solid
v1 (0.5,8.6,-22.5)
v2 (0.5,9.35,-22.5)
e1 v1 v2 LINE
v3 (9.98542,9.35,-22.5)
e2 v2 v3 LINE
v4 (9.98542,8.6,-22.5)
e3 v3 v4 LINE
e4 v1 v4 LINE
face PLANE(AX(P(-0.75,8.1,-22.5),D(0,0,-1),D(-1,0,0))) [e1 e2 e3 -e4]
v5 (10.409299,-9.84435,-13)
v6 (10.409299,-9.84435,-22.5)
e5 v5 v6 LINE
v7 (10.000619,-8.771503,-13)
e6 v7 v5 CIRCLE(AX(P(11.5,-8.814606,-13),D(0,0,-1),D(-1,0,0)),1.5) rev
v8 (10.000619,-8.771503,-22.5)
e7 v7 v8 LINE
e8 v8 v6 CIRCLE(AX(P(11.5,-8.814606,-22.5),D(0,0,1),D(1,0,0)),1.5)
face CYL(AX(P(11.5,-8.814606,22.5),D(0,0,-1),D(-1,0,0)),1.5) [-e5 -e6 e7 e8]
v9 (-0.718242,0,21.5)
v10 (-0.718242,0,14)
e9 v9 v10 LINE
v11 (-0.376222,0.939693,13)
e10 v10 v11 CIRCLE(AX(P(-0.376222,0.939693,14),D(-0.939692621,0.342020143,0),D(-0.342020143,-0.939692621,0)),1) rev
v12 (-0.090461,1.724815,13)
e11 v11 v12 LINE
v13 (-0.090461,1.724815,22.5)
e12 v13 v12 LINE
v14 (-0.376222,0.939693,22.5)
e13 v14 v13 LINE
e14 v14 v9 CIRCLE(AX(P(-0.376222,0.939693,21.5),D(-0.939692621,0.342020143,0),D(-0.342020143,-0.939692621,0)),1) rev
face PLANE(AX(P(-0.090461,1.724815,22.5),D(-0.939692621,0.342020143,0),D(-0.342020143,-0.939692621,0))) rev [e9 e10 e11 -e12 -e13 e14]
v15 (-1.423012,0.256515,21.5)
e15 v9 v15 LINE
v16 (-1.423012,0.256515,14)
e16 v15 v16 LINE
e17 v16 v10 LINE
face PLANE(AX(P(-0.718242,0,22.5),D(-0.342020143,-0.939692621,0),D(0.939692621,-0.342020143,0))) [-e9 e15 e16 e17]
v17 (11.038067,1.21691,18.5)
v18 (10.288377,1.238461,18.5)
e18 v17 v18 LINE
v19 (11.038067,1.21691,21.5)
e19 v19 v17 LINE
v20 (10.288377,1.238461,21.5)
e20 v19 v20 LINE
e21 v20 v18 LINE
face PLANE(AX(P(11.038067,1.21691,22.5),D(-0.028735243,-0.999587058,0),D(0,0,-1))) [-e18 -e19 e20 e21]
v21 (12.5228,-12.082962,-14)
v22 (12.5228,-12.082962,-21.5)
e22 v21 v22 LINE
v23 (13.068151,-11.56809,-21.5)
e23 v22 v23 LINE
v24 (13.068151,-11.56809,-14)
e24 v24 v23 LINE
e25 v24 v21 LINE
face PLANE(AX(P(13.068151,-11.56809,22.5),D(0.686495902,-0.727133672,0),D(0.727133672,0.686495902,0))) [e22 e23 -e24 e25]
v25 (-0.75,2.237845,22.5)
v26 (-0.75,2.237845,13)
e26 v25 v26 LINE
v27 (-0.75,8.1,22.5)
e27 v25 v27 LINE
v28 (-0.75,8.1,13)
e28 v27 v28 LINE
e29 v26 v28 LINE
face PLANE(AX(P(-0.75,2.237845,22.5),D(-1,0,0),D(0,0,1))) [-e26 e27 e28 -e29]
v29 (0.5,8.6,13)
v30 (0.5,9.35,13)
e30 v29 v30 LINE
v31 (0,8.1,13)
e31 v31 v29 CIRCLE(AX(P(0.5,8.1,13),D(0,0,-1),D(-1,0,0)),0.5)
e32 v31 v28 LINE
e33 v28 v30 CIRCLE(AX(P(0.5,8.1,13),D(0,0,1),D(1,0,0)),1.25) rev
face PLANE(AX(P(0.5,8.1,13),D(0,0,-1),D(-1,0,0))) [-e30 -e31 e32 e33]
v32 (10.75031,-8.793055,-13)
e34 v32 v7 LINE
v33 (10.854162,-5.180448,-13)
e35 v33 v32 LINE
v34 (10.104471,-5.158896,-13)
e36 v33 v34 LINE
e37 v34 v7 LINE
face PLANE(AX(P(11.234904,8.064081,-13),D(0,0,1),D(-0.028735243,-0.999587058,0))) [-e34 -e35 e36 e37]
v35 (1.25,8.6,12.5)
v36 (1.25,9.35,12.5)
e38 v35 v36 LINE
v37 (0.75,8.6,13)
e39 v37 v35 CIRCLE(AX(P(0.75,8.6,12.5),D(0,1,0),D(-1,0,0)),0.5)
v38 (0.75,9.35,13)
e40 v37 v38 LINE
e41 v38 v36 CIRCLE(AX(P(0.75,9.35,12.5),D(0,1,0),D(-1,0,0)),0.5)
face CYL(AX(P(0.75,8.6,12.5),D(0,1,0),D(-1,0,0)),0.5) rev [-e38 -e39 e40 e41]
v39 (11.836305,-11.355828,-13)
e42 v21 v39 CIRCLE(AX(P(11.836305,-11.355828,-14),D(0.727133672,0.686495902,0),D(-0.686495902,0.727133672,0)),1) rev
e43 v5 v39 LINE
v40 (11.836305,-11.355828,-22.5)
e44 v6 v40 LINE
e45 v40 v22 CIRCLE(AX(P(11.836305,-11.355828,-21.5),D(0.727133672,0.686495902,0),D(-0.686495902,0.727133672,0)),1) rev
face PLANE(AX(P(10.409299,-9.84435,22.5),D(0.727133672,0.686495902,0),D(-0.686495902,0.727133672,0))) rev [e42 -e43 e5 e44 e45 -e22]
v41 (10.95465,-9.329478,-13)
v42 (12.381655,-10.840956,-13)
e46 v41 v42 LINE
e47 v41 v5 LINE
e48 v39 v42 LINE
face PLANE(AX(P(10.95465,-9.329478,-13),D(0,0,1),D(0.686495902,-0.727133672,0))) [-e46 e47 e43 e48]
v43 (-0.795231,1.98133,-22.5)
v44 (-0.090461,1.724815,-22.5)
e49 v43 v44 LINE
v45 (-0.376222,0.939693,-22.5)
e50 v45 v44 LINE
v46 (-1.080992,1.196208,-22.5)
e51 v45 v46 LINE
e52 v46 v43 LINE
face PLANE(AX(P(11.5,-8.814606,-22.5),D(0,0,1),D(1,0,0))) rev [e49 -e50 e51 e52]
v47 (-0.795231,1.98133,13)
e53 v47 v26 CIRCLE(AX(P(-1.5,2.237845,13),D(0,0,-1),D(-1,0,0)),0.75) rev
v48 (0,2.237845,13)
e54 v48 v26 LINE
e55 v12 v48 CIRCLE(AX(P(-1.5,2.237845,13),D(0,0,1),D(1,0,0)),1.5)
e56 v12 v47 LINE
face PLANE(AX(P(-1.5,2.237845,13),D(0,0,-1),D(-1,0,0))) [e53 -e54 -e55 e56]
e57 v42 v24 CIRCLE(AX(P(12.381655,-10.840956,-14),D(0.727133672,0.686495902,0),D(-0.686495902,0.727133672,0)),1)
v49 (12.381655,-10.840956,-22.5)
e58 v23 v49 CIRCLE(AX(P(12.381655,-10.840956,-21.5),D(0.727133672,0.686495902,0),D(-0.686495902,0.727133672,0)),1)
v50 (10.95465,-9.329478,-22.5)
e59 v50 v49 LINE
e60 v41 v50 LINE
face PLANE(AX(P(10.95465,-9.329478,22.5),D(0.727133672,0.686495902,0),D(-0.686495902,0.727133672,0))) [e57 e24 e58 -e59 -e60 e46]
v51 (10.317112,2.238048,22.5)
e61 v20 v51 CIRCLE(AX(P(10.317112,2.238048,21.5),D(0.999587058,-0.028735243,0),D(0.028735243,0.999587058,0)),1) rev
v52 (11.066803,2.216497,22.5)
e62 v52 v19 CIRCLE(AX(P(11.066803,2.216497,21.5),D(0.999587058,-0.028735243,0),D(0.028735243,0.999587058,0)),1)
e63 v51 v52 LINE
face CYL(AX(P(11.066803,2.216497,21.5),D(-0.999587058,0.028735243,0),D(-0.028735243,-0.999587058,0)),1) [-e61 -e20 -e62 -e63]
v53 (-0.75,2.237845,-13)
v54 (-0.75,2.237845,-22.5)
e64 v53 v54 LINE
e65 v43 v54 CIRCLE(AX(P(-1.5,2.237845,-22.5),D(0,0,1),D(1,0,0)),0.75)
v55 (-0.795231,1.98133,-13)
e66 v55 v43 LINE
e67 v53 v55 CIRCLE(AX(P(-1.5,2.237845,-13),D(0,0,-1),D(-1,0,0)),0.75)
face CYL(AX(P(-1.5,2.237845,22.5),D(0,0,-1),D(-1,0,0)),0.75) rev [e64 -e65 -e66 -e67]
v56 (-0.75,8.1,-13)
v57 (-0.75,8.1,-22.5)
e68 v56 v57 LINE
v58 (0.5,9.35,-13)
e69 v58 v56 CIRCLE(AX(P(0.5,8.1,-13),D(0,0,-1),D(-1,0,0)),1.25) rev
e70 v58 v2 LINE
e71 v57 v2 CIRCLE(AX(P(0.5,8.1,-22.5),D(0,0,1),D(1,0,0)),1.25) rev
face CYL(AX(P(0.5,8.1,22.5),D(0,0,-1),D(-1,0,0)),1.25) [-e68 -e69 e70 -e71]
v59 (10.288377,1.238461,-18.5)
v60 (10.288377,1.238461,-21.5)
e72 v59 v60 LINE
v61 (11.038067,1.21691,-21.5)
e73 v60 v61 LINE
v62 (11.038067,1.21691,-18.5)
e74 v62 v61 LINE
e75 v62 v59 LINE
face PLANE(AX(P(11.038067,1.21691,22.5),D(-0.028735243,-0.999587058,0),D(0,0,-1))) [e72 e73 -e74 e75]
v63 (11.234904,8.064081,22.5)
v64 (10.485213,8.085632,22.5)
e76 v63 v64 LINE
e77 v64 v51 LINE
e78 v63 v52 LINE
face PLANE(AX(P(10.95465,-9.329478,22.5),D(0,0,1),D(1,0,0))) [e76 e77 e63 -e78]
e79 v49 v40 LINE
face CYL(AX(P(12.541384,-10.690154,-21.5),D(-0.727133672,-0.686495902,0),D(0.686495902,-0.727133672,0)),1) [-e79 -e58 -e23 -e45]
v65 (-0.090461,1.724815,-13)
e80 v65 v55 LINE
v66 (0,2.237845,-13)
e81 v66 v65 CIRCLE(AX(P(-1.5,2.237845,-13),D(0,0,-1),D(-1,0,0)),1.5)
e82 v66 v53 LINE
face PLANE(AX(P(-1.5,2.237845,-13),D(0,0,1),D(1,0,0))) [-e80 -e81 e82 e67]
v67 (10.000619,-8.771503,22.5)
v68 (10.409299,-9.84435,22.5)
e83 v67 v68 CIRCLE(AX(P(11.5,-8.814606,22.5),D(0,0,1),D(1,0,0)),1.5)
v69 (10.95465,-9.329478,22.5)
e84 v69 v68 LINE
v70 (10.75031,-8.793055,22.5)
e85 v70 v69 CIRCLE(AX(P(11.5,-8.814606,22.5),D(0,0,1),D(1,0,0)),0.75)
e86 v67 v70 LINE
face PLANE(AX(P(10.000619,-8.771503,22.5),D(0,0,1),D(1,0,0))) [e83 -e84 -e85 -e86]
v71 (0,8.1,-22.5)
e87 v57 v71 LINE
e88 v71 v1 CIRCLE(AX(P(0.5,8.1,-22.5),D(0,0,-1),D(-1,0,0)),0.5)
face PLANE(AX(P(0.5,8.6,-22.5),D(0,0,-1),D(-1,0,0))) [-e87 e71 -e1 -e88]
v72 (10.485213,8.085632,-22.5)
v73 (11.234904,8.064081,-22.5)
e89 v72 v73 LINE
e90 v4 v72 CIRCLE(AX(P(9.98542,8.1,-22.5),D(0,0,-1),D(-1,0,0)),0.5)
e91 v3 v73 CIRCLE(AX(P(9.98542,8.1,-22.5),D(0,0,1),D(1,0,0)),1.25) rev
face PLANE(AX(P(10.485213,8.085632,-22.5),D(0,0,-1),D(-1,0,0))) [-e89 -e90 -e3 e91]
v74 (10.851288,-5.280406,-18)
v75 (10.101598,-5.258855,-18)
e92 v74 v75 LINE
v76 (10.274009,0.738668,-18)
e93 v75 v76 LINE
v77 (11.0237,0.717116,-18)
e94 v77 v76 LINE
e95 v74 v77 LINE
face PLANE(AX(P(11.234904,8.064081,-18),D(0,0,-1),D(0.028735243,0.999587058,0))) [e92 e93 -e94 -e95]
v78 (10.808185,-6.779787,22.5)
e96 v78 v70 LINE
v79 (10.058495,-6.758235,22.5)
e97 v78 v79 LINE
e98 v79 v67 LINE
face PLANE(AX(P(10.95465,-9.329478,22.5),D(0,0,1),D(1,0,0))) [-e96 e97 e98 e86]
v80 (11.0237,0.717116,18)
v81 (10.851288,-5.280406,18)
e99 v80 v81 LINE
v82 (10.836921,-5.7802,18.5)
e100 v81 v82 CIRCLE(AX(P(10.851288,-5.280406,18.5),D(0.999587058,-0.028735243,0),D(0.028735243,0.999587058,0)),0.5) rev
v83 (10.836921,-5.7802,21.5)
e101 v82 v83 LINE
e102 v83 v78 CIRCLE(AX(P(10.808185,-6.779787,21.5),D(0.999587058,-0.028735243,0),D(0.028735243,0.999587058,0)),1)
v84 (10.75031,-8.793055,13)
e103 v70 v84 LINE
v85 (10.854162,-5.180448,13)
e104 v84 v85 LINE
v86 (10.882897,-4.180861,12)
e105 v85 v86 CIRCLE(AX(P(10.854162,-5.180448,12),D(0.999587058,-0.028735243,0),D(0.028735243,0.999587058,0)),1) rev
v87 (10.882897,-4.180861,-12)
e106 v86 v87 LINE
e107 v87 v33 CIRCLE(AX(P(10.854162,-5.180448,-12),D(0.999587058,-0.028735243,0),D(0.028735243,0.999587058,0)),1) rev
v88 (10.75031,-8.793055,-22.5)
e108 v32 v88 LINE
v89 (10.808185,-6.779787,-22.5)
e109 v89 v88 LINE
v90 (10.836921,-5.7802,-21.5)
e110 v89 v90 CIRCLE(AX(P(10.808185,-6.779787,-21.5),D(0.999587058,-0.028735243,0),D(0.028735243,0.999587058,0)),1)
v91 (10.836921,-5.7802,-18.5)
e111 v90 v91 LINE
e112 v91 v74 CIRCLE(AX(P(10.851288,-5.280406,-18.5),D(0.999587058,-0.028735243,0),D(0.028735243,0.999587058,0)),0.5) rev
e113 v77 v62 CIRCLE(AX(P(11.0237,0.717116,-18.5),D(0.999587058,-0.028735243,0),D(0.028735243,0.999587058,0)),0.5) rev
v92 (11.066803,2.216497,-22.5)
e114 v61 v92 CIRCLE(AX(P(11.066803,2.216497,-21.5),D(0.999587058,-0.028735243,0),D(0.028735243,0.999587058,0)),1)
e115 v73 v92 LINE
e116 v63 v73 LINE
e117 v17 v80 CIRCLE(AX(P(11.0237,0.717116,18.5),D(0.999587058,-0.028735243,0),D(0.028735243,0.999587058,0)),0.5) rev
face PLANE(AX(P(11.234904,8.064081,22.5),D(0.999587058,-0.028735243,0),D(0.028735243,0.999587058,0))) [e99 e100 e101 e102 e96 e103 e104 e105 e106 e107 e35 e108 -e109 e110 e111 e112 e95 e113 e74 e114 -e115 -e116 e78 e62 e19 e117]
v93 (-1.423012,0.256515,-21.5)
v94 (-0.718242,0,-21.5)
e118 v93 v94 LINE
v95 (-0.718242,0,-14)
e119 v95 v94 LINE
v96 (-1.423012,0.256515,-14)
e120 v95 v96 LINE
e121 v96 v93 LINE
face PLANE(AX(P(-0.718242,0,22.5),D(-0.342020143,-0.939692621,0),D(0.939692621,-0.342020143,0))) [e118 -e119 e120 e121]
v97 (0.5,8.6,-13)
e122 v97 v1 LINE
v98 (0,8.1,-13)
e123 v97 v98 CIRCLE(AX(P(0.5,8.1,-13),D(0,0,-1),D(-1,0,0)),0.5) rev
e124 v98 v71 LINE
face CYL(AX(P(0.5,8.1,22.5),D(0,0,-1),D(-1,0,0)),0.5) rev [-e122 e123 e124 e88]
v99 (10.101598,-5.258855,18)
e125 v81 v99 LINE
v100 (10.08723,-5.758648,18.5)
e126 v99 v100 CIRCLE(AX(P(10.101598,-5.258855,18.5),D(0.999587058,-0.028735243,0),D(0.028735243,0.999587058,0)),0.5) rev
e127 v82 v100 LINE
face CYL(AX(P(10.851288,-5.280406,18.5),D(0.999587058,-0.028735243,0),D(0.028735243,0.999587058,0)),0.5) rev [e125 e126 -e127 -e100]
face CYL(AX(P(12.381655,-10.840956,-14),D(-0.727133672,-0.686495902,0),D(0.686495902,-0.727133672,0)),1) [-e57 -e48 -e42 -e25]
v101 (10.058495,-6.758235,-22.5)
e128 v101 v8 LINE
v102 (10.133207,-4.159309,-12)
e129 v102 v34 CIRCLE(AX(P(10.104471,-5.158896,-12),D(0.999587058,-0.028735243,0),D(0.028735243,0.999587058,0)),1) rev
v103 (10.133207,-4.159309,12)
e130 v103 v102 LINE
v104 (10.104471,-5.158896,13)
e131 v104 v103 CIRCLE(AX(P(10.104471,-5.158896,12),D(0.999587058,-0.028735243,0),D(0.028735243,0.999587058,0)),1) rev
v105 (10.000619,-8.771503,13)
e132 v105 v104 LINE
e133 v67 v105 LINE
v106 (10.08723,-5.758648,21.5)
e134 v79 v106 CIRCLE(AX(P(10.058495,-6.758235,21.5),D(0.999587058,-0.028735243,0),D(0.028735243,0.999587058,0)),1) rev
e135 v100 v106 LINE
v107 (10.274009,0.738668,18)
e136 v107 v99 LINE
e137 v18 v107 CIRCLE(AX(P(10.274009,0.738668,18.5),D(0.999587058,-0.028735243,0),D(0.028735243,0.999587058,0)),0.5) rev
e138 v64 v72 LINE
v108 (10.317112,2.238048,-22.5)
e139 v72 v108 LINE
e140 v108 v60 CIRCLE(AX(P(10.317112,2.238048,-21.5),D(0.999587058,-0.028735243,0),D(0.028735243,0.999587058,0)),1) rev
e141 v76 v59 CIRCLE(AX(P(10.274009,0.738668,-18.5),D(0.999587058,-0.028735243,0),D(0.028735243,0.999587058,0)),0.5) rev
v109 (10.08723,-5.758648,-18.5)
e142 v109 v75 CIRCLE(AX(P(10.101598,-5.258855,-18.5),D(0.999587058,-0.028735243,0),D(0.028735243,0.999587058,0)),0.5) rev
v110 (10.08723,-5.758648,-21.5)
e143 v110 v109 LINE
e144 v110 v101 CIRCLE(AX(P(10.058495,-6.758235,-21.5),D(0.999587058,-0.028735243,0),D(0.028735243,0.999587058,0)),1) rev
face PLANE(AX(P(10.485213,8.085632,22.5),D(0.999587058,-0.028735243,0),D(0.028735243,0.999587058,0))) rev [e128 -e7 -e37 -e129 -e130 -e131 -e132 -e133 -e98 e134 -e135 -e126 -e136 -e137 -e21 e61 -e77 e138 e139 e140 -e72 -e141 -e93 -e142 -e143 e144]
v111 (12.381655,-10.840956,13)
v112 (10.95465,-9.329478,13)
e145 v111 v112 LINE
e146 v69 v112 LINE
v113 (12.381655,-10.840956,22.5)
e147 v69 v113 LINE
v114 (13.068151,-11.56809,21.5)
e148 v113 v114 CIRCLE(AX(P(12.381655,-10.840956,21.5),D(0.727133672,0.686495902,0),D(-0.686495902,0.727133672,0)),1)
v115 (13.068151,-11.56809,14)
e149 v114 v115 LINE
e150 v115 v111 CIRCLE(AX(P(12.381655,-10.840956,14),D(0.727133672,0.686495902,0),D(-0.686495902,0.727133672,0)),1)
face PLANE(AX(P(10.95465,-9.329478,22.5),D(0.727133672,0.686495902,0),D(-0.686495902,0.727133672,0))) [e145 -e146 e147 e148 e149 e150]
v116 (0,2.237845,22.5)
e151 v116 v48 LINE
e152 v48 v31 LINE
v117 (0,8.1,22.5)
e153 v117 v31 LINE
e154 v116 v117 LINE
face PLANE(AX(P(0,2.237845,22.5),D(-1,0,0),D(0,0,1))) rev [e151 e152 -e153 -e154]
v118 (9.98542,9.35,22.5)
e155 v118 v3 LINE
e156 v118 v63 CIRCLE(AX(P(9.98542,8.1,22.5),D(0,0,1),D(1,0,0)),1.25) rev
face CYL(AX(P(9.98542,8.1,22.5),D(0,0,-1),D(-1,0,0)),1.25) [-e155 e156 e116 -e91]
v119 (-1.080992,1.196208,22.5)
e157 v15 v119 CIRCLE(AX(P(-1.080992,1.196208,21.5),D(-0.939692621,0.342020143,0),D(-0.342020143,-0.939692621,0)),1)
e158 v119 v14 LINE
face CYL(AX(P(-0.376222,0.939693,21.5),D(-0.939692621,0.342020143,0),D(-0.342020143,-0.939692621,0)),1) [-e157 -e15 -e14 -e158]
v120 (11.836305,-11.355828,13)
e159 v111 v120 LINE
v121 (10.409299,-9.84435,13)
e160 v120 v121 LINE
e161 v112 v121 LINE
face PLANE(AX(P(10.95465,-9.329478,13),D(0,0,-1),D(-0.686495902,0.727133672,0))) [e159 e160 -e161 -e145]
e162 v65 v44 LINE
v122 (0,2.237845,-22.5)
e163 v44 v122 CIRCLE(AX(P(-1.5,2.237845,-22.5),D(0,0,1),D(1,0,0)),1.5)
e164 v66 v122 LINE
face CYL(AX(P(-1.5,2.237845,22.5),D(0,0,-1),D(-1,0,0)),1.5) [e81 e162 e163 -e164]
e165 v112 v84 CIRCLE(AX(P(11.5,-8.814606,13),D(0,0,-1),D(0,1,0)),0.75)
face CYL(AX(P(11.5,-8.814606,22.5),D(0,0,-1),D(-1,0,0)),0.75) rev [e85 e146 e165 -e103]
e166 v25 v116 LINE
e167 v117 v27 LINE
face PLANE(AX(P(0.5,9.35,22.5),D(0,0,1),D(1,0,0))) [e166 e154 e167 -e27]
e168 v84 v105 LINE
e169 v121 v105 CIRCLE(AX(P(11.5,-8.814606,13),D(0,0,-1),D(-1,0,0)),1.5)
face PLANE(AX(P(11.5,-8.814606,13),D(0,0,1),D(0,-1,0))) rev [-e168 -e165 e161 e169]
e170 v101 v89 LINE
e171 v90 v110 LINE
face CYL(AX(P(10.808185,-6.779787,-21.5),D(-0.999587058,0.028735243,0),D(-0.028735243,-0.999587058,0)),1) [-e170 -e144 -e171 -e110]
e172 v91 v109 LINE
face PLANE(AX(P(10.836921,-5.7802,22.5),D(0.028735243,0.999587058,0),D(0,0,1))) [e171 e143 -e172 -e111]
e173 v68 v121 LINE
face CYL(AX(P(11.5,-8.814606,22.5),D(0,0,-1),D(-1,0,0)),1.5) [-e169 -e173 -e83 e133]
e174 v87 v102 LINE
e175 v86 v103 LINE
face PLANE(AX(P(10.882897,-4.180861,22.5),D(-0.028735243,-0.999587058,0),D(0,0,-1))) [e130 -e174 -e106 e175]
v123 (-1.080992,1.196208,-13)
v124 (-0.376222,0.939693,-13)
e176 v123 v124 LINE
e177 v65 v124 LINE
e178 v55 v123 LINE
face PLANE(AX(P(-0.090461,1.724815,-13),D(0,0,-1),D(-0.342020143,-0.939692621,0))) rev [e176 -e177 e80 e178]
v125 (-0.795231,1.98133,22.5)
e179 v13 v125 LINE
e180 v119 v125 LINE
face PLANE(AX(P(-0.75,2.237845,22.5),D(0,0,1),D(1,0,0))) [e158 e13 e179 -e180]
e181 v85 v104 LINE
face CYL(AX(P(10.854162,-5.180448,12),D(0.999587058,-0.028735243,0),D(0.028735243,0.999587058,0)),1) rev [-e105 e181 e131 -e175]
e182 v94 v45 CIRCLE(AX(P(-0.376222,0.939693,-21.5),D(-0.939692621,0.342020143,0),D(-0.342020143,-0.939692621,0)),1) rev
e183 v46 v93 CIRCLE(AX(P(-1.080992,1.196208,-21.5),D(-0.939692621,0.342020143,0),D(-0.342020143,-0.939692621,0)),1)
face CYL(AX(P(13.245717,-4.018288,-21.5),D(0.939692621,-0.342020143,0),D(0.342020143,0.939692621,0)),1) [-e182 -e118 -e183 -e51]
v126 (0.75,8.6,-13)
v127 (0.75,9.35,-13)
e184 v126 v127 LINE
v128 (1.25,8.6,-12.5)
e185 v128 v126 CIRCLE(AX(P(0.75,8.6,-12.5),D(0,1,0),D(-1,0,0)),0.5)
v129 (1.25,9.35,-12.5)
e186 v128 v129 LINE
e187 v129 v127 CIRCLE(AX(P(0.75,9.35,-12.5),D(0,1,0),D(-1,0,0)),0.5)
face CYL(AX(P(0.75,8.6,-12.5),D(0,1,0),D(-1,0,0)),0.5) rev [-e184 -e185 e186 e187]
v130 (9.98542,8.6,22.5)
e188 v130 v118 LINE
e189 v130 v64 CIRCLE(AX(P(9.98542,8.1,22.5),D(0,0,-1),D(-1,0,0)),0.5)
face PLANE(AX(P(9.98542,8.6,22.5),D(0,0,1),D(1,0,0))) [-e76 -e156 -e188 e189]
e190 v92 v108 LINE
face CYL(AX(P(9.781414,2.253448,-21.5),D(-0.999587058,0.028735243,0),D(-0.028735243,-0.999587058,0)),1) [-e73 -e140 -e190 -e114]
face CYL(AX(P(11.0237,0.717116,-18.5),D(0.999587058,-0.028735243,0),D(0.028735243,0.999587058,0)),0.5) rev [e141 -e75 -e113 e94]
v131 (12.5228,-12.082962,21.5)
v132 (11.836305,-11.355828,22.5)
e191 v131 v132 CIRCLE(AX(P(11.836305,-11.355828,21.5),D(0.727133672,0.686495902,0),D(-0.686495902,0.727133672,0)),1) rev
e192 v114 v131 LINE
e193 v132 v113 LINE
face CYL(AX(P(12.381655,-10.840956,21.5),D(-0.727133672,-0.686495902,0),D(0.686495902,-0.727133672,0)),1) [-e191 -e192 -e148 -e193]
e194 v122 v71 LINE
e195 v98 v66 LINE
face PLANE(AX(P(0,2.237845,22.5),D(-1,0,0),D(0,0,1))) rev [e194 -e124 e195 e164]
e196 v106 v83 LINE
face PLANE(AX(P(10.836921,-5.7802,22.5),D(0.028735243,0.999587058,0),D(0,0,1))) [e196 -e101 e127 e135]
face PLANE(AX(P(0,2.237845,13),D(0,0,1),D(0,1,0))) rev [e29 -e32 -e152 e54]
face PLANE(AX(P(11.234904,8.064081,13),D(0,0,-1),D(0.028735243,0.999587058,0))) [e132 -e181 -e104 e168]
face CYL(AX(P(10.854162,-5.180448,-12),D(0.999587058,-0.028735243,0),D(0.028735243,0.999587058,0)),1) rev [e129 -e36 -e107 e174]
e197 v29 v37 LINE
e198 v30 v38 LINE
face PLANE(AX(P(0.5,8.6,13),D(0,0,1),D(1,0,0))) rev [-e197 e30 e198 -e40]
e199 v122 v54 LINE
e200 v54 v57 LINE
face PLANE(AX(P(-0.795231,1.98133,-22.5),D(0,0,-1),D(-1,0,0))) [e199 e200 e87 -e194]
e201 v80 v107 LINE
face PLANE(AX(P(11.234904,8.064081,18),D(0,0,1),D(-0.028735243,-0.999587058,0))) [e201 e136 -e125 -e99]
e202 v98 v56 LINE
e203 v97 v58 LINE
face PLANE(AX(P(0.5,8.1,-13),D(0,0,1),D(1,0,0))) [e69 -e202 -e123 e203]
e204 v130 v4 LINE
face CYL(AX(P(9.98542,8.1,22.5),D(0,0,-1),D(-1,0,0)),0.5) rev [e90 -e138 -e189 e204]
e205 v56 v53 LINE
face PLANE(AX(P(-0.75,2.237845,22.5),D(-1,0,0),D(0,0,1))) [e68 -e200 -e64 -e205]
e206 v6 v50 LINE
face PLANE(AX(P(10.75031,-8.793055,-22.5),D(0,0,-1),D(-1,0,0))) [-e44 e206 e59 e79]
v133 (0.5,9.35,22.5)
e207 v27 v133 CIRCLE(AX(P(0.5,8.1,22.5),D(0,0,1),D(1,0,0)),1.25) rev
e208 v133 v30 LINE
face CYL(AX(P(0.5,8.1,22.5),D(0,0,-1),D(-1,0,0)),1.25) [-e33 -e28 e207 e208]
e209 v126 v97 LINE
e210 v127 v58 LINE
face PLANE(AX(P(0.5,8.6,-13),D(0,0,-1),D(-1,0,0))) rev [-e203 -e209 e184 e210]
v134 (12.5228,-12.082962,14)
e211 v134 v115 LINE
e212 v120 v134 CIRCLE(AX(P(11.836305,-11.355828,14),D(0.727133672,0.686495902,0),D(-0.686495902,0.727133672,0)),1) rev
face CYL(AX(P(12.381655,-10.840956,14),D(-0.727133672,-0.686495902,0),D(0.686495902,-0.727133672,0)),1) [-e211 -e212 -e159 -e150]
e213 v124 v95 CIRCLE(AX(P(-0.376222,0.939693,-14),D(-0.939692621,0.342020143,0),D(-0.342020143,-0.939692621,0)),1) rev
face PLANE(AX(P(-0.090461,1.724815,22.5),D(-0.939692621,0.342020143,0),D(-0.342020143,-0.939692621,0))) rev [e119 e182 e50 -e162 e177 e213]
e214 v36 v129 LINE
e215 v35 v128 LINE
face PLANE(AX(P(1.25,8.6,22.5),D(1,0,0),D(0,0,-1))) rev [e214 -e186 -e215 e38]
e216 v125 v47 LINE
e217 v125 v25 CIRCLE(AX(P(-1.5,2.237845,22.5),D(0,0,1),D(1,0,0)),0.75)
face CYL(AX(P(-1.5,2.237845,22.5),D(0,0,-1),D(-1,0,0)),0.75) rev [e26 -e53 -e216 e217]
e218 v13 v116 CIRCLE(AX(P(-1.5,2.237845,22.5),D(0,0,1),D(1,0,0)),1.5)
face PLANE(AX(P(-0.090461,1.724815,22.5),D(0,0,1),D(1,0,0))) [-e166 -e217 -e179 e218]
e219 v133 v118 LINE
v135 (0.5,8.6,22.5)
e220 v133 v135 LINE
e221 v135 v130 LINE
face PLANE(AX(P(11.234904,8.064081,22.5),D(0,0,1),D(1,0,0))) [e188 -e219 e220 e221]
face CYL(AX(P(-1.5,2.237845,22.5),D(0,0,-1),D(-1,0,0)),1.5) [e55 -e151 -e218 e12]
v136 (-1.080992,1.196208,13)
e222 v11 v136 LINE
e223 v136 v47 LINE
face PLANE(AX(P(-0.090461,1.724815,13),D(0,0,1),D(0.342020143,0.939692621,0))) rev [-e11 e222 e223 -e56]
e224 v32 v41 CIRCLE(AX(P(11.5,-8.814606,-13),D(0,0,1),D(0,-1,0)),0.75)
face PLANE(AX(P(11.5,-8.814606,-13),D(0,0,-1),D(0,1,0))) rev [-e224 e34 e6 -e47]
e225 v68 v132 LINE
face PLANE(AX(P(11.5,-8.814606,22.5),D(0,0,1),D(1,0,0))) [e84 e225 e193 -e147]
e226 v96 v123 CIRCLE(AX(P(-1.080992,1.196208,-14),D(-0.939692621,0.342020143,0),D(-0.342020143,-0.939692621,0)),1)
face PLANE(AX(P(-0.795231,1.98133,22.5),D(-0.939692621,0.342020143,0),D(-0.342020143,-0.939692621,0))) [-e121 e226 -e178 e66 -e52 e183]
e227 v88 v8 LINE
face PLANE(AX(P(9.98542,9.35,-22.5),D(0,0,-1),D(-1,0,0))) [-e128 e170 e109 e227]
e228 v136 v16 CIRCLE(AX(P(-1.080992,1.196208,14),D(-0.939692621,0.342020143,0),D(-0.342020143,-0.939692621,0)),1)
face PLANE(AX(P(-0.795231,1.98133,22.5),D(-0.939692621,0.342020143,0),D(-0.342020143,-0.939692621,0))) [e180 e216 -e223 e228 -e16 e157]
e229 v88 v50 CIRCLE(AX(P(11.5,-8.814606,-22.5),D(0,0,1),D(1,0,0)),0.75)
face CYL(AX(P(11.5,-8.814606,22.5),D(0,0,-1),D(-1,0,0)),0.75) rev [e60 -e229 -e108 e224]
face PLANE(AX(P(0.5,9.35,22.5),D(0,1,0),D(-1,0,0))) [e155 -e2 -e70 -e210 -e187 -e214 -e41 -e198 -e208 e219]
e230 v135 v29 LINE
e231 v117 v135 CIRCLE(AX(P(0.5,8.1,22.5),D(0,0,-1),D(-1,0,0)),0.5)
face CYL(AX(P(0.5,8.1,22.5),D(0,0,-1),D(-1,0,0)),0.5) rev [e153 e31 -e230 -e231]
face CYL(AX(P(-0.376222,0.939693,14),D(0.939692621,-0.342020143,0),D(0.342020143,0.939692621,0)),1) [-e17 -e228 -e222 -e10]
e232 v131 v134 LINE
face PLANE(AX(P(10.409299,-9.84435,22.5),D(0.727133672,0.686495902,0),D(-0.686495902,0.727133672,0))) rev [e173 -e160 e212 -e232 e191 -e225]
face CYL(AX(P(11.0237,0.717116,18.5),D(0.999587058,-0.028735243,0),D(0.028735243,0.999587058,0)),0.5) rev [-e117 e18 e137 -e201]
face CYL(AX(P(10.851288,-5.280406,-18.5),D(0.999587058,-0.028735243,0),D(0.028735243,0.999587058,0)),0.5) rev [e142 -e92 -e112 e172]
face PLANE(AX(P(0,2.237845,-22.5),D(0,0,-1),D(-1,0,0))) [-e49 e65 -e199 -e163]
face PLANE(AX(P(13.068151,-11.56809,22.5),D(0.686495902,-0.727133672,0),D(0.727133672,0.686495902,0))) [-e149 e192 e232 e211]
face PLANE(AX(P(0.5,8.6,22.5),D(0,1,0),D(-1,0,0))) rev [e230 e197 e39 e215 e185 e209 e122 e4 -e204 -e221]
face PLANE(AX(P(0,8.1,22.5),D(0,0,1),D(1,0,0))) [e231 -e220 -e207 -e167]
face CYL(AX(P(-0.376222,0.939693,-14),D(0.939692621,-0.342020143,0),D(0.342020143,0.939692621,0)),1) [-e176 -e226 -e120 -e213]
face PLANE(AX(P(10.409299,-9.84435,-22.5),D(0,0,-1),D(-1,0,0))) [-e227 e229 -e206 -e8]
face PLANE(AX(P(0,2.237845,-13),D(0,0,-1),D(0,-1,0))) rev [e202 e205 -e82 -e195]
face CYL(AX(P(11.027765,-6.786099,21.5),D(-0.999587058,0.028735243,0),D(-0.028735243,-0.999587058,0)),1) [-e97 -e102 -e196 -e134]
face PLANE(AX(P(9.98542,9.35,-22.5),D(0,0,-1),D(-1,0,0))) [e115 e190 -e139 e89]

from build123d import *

# Parameters (mm, degrees)
BASE_FLANGE1_DEPTH = 22.5
CUT_EXTRUDE1_START = -9.35
CUT_EXTRUDE1_DEPTH = 9.35
CUT_EXTRUDE2_DEPTH = 28.952537171
FILLET_R1_R        = 1


# Read off the part's stored shape, not the designer's step: Cut-Extrude1
# Sheet-metal steps are written as plain solids
with BuildPart() as part:
    # Sketch1 → Base-Flange1 (new, symmetric)
    with BuildSketch(Plane.XY):
        with BuildLine():
            Line((-0.718242301, 0), (-0.090461069, 1.72481476))
            ThreePointArc((-0.090461069, 1.72481476), (-0.02278837, 1.977372708), (0, 2.237844975))
            Line((0, 2.237844975), (0, 8.1))
            ThreePointArc((0, 8.1), (0.146446609, 8.453553391), (0.5, 8.6))
            Line((0.5, 8.6), (9.985419886, 8.6))
            ThreePointArc((9.985419886, 8.6), (10.344017022, 8.448436644), (10.485213415, 8.085632378))
            Line((10.485213415, 8.085632378), (10.000619414, -8.771503263))
            ThreePointArc((10.000619414, -8.771503263), (10.098258212, -9.348572383), (10.409299492, -9.84434998))
            Line((10.409299492, -9.84434998), (12.522800458, -12.082961625))
            Line((12.522800458, -12.082961625), (13.068150712, -11.568089698))
            Line((13.068150712, -11.568089698), (10.954649746, -9.329478054))
            ThreePointArc((10.954649746, -9.329478054), (10.799129106, -9.081589256), (10.750309707, -8.793054696))
            Line((10.750309707, -8.793054696), (11.234903709, 8.064080946))
            ThreePointArc((11.234903709, 8.064080946), (10.881912725, 8.971091609), (9.985419886, 9.35))
            Line((9.985419886, 9.35), (0.5, 9.35))
            ThreePointArc((0.5, 9.35), (-0.383883476, 8.983883476), (-0.75, 8.1))
            Line((-0.75, 8.1), (-0.75, 2.237844975))
            ThreePointArc((-0.75, 2.237844975), (-0.761394185, 2.107608841), (-0.795230534, 1.981329867))
            Line((-0.795230534, 1.981329867), (-1.423011767, 0.256515107))
            Line((-1.423011767, 0.256515107), (-0.718242301, 0))
        make_face()
    extrude(amount=BASE_FLANGE1_DEPTH, both=True)

    # Cut-Extrude1 outline → Cut-Extrude1 (cut)
    with BuildSketch(Plane(origin=(0, 9.35, 0), x_dir=(-1, 0, 0), z_dir=(0, 1, 0)).offset(CUT_EXTRUDE1_START)):
        with BuildLine():
            ThreePointArc((-0.75, 13), (-1.103553391, 12.853553391), (-1.25, 12.5))
            Line((-1.25, 12.5), (-1.25, -12.5))
            ThreePointArc((-1.25, -12.5), (-1.103553391, -12.853553391), (-0.75, -13))
            Line((-0.75, -13), (3, -13))
            Line((3, -13), (3, 13))
            Line((3, 13), (-0.75, 13))
        make_face()
    extrude(amount=CUT_EXTRUDE1_DEPTH, mode=Mode.SUBTRACT)

    # Sketch5 → Cut-Extrude2 (cut, through all)
    with BuildSketch(Plane(origin=(10.244308957, -0.294494318, 0), x_dir=(0, 0, -1), z_dir=(0.999587057638364, -0.02873524320200468, 0))):
        with BuildLine():
            Line((-22.5, 1.533588636), (-18.5, 1.533588636))
            ThreePointArc((-18.5, 1.533588636), (-18.146446609, 1.387142026), (-18, 1.033588636))
            Line((-18, 1.033588636), (-18, -4.966411364))
            ThreePointArc((-18, -4.966411364), (-18.146446609, -5.319964755), (-18.5, -5.466411364))
            Line((-18.5, -5.466411364), (-22.5, -5.466411364))
            Line((-22.5, -5.466411364), (-22.5, 1.533588636))
        make_face()
        with BuildLine():
            Line((18, 1.033588636), (18, -4.966411364))
            ThreePointArc((18, -4.966411364), (18.146446609, -5.319964755), (18.5, -5.466411364))
            Line((18.5, -5.466411364), (22.5, -5.466411364))
            Line((22.5, -5.466411364), (22.5, 1.533588636))
            Line((22.5, 1.533588636), (18.5, 1.533588636))
            ThreePointArc((18.5, 1.533588636), (18.146446609, 1.387142026), (18, 1.033588636))
        make_face()
        with BuildLine():
            Line((-12, -3.866411364), (12, -3.866411364))
            ThreePointArc((12, -3.866411364), (12.707106781, -4.159304583), (13, -4.866411364))
            Line((13, -4.866411364), (13, -11.718126341))
            Line((13, -11.718126341), (-13, -11.718126341))
            Line((-13, -11.718126341), (-13, -4.866411364))
            ThreePointArc((-13, -4.866411364), (-12.707106781, -4.159304583), (-12, -3.866411364))
        make_face()
    extrude(amount=CUT_EXTRUDE2_DEPTH, mode=Mode.SUBTRACT)

    # R1
    fillet_r1_edges = [part.edges().sort_by_distance(p)[0] for p in [
        (10.663222146, 1.227685317, -22.5),
        (10.462075444, -5.769424086, -22.5),
        (-1.070627034, 0.128257554, -22.5),
        (12.795475585, -11.825525661, 13),
        (12.795475585, -11.825525661, -13),
        (10.663222146, 1.227685317, 22.5),
        (10.462075444, -5.769424086, 22.5),
        (12.795475585, -11.825525661, -22.5),
        (-1.070627034, 0.128257554, 22.5),
        (12.795475585, -11.825525661, 22.5),
        (-1.070627034, 0.128257554, 13),
        (-1.070627034, 0.128257554, -13),
    ]]
    fillet(fillet_r1_edges, radius=FILLET_R1_R)


solid = part.part
